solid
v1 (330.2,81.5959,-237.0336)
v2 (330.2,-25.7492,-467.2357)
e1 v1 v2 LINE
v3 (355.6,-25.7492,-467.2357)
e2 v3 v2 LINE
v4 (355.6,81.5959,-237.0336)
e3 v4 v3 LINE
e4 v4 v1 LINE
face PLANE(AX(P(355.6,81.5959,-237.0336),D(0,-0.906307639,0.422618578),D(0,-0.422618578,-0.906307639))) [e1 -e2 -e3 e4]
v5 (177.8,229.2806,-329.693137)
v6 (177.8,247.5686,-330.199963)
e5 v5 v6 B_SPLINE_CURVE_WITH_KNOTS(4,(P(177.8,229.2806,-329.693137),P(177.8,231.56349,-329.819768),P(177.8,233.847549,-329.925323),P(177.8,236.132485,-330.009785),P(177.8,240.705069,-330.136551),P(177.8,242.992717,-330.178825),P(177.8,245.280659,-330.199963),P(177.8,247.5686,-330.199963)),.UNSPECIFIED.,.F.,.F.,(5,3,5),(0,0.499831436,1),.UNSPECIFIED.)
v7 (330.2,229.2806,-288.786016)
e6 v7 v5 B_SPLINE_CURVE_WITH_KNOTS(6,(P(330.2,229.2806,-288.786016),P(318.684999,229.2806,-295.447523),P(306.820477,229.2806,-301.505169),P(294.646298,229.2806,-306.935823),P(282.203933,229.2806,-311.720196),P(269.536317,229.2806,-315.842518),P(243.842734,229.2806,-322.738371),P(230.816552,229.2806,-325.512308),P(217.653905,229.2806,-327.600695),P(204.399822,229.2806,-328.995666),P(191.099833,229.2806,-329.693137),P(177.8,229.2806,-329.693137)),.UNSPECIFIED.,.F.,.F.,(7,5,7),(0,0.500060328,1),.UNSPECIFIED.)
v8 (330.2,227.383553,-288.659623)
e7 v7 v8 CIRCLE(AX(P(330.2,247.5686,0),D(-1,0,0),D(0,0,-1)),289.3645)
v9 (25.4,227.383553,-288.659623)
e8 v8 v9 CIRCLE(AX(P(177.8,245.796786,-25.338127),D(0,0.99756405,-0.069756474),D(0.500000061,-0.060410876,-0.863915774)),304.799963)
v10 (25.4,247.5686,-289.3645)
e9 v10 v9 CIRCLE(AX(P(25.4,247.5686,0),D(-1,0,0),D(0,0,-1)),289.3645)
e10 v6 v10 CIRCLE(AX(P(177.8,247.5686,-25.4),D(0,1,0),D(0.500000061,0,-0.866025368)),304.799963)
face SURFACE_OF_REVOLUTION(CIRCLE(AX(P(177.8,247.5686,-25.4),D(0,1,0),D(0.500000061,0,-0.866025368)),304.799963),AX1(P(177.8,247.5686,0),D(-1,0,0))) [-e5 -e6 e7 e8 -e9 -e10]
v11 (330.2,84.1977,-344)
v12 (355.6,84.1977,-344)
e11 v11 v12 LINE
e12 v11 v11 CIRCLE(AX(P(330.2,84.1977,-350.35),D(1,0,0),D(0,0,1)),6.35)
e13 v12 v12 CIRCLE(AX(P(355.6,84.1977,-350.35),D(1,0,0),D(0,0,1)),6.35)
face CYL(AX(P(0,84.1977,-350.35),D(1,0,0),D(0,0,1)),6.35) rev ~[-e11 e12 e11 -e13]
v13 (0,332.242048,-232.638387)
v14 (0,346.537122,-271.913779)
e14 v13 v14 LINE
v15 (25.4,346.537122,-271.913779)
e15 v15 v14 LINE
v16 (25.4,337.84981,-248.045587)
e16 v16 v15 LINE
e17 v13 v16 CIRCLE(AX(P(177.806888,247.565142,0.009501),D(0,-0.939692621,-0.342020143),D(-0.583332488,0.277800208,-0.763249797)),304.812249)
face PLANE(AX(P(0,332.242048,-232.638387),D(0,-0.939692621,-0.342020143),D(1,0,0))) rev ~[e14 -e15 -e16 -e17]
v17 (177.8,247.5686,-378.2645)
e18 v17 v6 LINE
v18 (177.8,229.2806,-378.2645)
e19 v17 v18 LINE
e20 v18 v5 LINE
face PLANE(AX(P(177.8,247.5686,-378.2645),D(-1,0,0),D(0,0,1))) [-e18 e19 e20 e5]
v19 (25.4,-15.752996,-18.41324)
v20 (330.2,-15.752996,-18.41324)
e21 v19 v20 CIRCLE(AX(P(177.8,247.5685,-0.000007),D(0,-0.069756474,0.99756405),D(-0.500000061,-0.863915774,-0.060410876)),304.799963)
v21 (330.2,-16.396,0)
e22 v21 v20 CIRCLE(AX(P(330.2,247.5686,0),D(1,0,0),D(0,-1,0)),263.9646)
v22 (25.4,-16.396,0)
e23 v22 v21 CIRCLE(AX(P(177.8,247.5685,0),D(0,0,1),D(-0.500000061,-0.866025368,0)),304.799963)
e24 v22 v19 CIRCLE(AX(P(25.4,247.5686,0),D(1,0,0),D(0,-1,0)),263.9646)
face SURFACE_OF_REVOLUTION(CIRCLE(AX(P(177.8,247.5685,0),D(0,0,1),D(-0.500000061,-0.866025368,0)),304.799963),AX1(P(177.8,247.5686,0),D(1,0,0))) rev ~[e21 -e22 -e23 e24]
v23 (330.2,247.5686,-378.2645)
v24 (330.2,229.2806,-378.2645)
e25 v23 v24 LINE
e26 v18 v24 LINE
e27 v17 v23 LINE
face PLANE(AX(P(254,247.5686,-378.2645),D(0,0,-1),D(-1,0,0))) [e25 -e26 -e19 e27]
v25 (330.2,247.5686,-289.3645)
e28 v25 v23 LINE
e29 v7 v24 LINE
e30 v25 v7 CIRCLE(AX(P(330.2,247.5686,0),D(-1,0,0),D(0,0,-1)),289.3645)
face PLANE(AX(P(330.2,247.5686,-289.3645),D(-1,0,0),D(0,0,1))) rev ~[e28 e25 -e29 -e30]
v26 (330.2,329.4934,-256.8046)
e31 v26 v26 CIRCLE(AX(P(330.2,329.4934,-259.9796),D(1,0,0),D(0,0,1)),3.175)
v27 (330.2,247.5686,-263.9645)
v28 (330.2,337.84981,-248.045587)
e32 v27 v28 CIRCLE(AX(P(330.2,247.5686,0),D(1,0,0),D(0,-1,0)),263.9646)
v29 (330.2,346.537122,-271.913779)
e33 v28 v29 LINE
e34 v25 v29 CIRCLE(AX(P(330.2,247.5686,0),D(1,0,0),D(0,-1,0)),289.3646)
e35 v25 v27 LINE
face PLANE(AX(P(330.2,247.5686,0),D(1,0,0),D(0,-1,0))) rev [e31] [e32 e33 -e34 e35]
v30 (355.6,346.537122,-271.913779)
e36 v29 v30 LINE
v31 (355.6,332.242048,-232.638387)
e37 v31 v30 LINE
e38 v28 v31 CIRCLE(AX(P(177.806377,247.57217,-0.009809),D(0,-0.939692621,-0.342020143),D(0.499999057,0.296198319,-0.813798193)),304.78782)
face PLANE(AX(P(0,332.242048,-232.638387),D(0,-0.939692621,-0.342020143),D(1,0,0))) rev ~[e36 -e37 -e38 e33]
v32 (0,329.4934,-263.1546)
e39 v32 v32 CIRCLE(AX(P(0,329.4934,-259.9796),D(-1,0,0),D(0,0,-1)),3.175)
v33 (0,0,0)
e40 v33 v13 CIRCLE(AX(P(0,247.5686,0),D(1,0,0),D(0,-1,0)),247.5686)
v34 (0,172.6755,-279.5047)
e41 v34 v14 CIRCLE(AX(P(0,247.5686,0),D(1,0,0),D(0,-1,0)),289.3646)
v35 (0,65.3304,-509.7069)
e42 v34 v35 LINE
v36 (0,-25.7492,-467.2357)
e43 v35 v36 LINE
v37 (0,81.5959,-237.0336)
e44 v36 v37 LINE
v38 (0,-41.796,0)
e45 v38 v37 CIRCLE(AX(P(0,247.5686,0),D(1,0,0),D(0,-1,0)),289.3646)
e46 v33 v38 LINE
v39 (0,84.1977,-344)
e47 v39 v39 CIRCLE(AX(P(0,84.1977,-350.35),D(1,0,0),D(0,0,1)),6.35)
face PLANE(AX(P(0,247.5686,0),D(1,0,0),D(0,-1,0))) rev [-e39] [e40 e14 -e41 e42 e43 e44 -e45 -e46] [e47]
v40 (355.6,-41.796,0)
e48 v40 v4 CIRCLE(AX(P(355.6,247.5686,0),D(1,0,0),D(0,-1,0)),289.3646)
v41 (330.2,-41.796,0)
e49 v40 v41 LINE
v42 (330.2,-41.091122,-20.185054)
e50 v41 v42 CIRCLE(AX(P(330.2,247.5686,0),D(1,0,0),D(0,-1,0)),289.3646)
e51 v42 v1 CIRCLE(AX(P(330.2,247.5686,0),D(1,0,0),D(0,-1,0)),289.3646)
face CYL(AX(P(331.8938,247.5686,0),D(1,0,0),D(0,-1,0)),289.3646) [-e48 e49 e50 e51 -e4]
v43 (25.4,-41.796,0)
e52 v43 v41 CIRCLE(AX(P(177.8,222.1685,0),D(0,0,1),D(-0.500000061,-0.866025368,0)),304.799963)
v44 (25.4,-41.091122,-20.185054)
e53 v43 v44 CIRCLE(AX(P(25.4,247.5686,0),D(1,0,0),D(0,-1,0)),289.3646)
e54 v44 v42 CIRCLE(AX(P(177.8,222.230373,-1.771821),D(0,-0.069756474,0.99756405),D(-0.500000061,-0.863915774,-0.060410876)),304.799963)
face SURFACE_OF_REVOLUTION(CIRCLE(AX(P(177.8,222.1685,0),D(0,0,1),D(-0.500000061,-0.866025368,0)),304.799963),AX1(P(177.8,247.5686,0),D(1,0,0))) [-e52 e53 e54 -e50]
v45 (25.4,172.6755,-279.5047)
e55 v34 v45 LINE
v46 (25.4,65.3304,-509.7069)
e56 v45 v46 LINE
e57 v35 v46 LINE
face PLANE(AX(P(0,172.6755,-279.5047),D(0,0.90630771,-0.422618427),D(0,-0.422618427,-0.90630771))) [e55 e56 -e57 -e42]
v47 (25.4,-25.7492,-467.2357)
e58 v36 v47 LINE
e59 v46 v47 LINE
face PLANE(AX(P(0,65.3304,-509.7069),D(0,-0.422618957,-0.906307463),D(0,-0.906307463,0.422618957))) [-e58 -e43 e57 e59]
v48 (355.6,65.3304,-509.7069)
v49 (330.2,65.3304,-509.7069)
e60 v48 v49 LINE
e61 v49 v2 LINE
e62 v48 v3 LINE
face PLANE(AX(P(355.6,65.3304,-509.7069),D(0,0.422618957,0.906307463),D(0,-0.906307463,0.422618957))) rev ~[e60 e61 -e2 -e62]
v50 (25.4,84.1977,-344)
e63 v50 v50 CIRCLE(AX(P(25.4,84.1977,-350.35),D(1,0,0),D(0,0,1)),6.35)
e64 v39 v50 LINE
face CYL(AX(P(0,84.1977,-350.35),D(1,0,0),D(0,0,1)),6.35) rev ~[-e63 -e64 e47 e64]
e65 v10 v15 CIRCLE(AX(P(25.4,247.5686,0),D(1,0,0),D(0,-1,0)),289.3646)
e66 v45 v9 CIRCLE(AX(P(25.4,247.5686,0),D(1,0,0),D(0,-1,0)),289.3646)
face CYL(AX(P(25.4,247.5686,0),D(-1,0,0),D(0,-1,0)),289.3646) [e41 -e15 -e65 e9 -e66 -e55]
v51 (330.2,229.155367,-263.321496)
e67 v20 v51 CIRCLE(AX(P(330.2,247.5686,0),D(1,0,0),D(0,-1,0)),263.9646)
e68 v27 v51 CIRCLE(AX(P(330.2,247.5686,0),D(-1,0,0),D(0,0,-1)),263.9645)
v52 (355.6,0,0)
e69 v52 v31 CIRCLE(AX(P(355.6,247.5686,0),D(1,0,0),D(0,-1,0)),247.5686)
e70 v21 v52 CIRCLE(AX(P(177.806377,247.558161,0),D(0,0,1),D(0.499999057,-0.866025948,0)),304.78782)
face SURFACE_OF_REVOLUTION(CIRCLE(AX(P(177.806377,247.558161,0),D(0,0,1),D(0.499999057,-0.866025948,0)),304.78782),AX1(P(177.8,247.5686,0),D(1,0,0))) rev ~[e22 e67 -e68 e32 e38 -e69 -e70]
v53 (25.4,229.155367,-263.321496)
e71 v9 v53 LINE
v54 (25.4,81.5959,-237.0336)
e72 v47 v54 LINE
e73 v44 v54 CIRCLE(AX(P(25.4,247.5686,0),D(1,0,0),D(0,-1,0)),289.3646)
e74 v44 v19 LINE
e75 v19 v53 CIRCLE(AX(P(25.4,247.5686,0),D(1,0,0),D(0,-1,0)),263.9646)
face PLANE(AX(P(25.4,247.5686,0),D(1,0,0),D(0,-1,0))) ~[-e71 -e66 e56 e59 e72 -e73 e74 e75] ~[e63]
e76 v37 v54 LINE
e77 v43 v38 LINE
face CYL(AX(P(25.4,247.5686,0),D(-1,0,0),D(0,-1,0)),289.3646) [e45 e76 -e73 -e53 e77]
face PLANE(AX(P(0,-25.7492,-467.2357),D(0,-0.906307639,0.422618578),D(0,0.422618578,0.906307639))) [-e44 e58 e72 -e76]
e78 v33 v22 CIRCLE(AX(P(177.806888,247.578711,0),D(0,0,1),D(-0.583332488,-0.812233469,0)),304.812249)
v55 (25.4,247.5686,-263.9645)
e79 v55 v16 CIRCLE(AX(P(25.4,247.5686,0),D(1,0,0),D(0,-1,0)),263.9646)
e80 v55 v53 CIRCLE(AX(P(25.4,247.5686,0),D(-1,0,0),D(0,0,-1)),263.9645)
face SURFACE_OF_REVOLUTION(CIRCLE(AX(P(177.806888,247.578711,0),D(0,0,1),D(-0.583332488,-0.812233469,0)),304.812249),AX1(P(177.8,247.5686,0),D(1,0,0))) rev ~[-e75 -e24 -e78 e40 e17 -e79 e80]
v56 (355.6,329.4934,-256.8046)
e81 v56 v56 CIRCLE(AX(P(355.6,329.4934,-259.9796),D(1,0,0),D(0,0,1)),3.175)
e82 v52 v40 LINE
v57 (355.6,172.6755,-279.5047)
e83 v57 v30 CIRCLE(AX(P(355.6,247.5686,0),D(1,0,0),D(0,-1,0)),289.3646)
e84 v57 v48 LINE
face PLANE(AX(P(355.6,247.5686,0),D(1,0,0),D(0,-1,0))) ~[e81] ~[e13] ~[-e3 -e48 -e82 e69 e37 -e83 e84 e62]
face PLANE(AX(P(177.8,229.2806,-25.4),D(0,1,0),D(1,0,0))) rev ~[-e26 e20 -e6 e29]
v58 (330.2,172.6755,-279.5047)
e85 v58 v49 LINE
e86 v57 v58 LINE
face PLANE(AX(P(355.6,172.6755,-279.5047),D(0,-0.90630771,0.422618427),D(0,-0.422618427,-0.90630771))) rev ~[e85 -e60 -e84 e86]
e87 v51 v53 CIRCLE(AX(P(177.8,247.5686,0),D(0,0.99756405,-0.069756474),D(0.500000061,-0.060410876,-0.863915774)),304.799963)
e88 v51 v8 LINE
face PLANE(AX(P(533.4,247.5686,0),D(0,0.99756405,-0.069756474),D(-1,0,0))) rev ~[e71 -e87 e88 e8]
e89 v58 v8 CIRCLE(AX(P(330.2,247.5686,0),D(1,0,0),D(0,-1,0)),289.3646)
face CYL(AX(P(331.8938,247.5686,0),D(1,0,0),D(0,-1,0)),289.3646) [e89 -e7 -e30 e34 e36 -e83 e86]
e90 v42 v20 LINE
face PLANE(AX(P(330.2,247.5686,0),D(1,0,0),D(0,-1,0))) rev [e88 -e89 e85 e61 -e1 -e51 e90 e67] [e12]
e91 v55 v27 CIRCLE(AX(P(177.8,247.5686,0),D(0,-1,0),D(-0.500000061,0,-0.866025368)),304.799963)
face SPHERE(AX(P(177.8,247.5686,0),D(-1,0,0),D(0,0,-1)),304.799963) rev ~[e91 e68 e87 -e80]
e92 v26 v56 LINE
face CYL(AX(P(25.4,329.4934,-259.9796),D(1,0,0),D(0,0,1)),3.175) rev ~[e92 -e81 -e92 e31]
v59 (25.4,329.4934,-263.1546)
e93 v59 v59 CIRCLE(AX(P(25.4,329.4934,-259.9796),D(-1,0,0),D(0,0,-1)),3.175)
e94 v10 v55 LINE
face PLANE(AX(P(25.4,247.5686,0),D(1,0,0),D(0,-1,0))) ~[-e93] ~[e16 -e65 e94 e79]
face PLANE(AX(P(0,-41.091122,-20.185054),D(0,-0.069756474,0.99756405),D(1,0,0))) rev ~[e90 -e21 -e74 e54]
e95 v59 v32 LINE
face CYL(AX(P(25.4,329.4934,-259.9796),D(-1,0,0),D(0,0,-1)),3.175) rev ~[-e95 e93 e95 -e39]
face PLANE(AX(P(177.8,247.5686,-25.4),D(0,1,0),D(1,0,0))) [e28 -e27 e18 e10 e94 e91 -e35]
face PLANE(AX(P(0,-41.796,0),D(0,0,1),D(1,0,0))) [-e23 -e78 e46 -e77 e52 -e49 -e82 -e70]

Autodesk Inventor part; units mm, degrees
ref_plane "YZ Plane" through (0, 0, 0) normal (1, 0, 0) x (0, 1, 0)
sketch "Sketch1" plane through (0, 0, 0) normal (0, 0, 1) x (1, 0, 0)
  line L0 (0, 0) -> (0, -41.796)
  line L1 (25.4, -16.396) -> (25.4, -41.796)
  arc A0 (0, 0) -> (25.4, -16.396) centre (177.8, 247.5686) ccw
  line L2 (355.6, 0) -> (355.6, -41.796)
  line L3 (330.2, -16.396) -> (330.2, -41.796)
  arc A1 (330.2, -16.396) -> (355.6, 0) centre (177.8, 247.5686) ccw
  line L4 (177.8, 247.5686) -> (533.4, 247.5686)
  line L5 (25.4, -41.796) -> (0, -41.796)
  line L6 (330.2, -41.796) -> (331.8938, -41.796)
  line L7 (331.8938, -41.796) -> (355.6, -41.796)
revolve "Revolution1" add sketch "Sketch1" angle 110 about axis through (177.8, 247.5686, 0) along (1, 0, 0)
sketch "Sketch2" plane through (0, -41.796, 0) normal (0, 0, 1) x (1, 0, 0)
  line L0 (25.4, 0) -> (25.4, 25.4) projected
  line L1 (355.6, 41.796) -> (355.6, 0) projected
  arc A0 (330.2, 25.4) -> (355.6, 41.796) centre (177.8, 289.3645) ccw projected
  line L2 (330.2, 0) -> (330.2, 25.4) projected
  arc A1 (25.4, 25.4) -> (330.2, 25.4) centre (177.8, 289.3645) ccw
  arc A2 (25.4, 0) -> (330.2, 0) centre (177.8, 263.9645) ccw
  line L3 (25.4, 25.4) -> (25.4, 0)
  line L4 (330.2, 25.4) -> (330.2, 0)
  line L5 (177.8, 289.3645) -> (533.4, 289.3645)
  line L6 (355.6, 0) -> (330.2, 0) projected
  dimension "d6" = 304.8
  dimension "d7" = 304.8
revolve "Revolution2" add sketch "Sketch2" angle 4 about axis through (177.8, 247.5686, 0) along (1, 0, 0) contours L0 A1 L2 A2
ref_plane "Work Plane1" through (0, 304.8, 0) normal (0, 1, 0) x (-1, 0, 0)
ref_plane "Work Plane2" through (533.4, 247.5686, 0) normal (0, 1, 0) x (-1, 0, 0)
sketch "Sketch8" plane through (533.4, 247.5686, 0) normal (0, 1, 0) x (-1, 0, 0)
  arc A0 (177.8, -247.5686) -> (203.2, -263.9645) centre (355.6, 0) ccw projected
  line L0 (203.2, -263.9645) -> (203.2, -289.3645) projected
  line L1 (203.2, -289.3645) -> (177.8, -289.3645) projected
  line L2 (177.8, -289.3645) -> (177.8, -247.5686) projected
  line L3 (508, -289.3645) -> (508, -263.9645) projected
  line L4 (533.4, -247.5686) -> (533.4, -289.3645) projected
  line L5 (533.4, -289.3645) -> (508, -289.3645) projected
  arc A1 (203.2, -263.9645) -> (508, -263.9645) centre (355.6, 0) ccw
  arc A2 (203.2, -289.3645) -> (508, -289.3645) centre (355.6, -25.4) ccw
  line L6 (203.2, -289.3645) -> (203.2, -263.9645)
  line L7 (508, -263.9645) -> (508, -289.3645)
  line L8 (355.6, 0) -> (533.4, 0)
  arc A3 (508, -263.9645) -> (533.4, -247.5686) centre (355.6, 0) ccw projected
  dimension "d44" = 304.8
  dimension "d45" = 304.8
revolve "Revolution4" add sketch "Sketch8" angle 4 about axis through (177.8, 247.5686, 0) along (-1, 0, 0) contours A1 L3 A2 L0
sketch "Sketch9" plane through (25.4, 247.5686, -263.9645) normal (1, 0, 0) x (0, 0, -1)
  line L0 (0, 0) -> (25.4, 0) projected
  line L1 (-15.919, 90.2812) -> (7.9492, 98.9685) projected
  line L2 (-3.9849, 94.6248) -> (-3.9849, 81.9248)
  point P0 (-263.9645, -247.5686)
  dimension "d47" = 12.7
hole "Hole3" at (25.4, 329.4934, -259.9796) direction (1, 0, 0) diameter 6.35 end through all
hole "Hole4" at (25.4, 329.4934, -259.9796) direction (-1, 0, 0) diameter 6.35 end through all
sketch "Sketch10" plane through (355.6, -41.796, 0) normal (1, 0, 0) x (0, 0, -1)
  arc A0 (0, 0) -> (271.9137, 388.333) centre (0, 289.3645) ccw projected
  line L0 (237.0336, 123.3919) -> (467.2357, 16.0468)
  line L1 (165.9727, 52.331) -> (419.9727, 52.331) construction
  line L2 (279.5047, 214.4715) -> (509.7069, 107.1264)
  line L3 (237.0336, 123.3919) -> (491.0336, 123.3919) construction
  line L4 (509.7069, 107.1264) -> (467.2357, 16.0468)
  arc A1 (237.0336, 123.3919) -> (279.5047, 214.4715) centre (0, 289.3645) ccw
  dimension "d65" = 254
  dimension "d66" = 25
  dimension "d67" = 254
  dimension "d68" = 25
extrude "Extrusion3" add sketch "Sketch10" against normal blind 25.4
sketch "Sketch11" plane through (0, -41.796, 0) normal (-1, 0, 0) x (0, 0, 1)
  arc A0 (-271.9137, 388.333) -> (0, 0) centre (0, 289.3645) ccw projected
  line L0 (-279.5047, 214.4715) -> (-509.7069, 107.1264) projected
  line L1 (-509.7069, 107.1264) -> (-467.2357, 16.0468) projected
  line L2 (-467.2357, 16.0468) -> (-237.0336, 123.3919) projected
extrude "Extrusion4" add sketch "Sketch11" against normal blind 25.4
sketch "Sketch12" plane through (0, -41.796, 0) normal (-1, 0, 0) x (0, 0, 1)
  line L0 (-509.7069, 107.1264) -> (-467.2357, 16.0468) projected
  line L1 (-467.2357, 16.0468) -> (-237.0336, 123.3919) projected
  line L2 (-488.4713, 61.5866) -> (-350.35, 125.9937)
  dimension "d73" = 152.4
hole "Hole5" at (0, 84.1977, -350.35) direction (1, 0, 0) diameter 12.7 end through all
sketch "Sketch13" plane through (177.8, 247.5686, -25.4) normal (0, 1, 0) x (1, 0, 0)
  line L0 (152.4, 263.9645) -> (152.4, 238.5645) projected
  arc A0 (152.4, 238.5645) -> (-152.4, 238.5645) centre (0, -25.4) ccw projected
  line L1 (152.4, 263.9645) -> (152.4, 352.8645)
  line L2 (152.4, 352.8645) -> (76.2, 352.8645)
  line L3 (76.2, 279.4) -> (76.2, 269.7213)
  line L4 (119.5299, 269.7213) -> (119.5299, 257.7498)
  line L5 (119.5299, 257.7498) -> (152.4, 257.7498)
  line L6 (152.4, 263.9645) -> (152.4, 257.7498)
  line L7 (119.5299, 269.7213) -> (76.2, 269.7213)
  line L8 (-152.4, 238.5645) -> (-152.4, 263.9645) projected
  line L9 (76.2, 352.8645) -> (0, 352.8645)
  line L10 (0, 352.8645) -> (0, 279.4)
  line L11 (0, 279.4) -> (76.2, 279.4)
  point P0 (-177.8, -25.4)
  dimension "d81" = 88.9
  dimension "d82" = 76.2
  dimension "d85" = 76.2
extrude "Extrusion5" add sketch "Sketch13" against normal blind 18.288 contours L0 L5 L4 L7 L3 L11 L10 L9 L2 L1
sketch "Sketch14" plane through (355.6, -41.796, 0) normal (1, 0, 0) x (0, 0, -1)
  circle A0 centre (350.35, 125.9937) radius 6.35 projected
  circle A1 centre (259.9796, 371.2894) radius 3.175 projected
  line L0 (0, 41.796) -> (0, 0) projected
  arc A2 (0, 0) -> (237.0336, 123.3919) centre (0, 289.3645) ccw projected
  line L1 (237.0336, 123.3919) -> (467.2357, 16.0468) projected
  line L2 (467.2357, 16.0468) -> (509.7069, 107.1264) projected
  line L3 (509.7069, 107.1264) -> (279.5047, 214.4715) projected
  arc A3 (279.5047, 214.4715) -> (271.9137, 388.333) centre (0, 289.3645) ccw projected
  line L4 (232.6384, 374.038) -> (271.9137, 388.333) projected
  arc A4 (0, 41.796) -> (232.6384, 374.038) centre (0, 289.3645) ccw projected
  dimension "d86" = 272.5823
properties part number "Inner" material "Polystyrene"
